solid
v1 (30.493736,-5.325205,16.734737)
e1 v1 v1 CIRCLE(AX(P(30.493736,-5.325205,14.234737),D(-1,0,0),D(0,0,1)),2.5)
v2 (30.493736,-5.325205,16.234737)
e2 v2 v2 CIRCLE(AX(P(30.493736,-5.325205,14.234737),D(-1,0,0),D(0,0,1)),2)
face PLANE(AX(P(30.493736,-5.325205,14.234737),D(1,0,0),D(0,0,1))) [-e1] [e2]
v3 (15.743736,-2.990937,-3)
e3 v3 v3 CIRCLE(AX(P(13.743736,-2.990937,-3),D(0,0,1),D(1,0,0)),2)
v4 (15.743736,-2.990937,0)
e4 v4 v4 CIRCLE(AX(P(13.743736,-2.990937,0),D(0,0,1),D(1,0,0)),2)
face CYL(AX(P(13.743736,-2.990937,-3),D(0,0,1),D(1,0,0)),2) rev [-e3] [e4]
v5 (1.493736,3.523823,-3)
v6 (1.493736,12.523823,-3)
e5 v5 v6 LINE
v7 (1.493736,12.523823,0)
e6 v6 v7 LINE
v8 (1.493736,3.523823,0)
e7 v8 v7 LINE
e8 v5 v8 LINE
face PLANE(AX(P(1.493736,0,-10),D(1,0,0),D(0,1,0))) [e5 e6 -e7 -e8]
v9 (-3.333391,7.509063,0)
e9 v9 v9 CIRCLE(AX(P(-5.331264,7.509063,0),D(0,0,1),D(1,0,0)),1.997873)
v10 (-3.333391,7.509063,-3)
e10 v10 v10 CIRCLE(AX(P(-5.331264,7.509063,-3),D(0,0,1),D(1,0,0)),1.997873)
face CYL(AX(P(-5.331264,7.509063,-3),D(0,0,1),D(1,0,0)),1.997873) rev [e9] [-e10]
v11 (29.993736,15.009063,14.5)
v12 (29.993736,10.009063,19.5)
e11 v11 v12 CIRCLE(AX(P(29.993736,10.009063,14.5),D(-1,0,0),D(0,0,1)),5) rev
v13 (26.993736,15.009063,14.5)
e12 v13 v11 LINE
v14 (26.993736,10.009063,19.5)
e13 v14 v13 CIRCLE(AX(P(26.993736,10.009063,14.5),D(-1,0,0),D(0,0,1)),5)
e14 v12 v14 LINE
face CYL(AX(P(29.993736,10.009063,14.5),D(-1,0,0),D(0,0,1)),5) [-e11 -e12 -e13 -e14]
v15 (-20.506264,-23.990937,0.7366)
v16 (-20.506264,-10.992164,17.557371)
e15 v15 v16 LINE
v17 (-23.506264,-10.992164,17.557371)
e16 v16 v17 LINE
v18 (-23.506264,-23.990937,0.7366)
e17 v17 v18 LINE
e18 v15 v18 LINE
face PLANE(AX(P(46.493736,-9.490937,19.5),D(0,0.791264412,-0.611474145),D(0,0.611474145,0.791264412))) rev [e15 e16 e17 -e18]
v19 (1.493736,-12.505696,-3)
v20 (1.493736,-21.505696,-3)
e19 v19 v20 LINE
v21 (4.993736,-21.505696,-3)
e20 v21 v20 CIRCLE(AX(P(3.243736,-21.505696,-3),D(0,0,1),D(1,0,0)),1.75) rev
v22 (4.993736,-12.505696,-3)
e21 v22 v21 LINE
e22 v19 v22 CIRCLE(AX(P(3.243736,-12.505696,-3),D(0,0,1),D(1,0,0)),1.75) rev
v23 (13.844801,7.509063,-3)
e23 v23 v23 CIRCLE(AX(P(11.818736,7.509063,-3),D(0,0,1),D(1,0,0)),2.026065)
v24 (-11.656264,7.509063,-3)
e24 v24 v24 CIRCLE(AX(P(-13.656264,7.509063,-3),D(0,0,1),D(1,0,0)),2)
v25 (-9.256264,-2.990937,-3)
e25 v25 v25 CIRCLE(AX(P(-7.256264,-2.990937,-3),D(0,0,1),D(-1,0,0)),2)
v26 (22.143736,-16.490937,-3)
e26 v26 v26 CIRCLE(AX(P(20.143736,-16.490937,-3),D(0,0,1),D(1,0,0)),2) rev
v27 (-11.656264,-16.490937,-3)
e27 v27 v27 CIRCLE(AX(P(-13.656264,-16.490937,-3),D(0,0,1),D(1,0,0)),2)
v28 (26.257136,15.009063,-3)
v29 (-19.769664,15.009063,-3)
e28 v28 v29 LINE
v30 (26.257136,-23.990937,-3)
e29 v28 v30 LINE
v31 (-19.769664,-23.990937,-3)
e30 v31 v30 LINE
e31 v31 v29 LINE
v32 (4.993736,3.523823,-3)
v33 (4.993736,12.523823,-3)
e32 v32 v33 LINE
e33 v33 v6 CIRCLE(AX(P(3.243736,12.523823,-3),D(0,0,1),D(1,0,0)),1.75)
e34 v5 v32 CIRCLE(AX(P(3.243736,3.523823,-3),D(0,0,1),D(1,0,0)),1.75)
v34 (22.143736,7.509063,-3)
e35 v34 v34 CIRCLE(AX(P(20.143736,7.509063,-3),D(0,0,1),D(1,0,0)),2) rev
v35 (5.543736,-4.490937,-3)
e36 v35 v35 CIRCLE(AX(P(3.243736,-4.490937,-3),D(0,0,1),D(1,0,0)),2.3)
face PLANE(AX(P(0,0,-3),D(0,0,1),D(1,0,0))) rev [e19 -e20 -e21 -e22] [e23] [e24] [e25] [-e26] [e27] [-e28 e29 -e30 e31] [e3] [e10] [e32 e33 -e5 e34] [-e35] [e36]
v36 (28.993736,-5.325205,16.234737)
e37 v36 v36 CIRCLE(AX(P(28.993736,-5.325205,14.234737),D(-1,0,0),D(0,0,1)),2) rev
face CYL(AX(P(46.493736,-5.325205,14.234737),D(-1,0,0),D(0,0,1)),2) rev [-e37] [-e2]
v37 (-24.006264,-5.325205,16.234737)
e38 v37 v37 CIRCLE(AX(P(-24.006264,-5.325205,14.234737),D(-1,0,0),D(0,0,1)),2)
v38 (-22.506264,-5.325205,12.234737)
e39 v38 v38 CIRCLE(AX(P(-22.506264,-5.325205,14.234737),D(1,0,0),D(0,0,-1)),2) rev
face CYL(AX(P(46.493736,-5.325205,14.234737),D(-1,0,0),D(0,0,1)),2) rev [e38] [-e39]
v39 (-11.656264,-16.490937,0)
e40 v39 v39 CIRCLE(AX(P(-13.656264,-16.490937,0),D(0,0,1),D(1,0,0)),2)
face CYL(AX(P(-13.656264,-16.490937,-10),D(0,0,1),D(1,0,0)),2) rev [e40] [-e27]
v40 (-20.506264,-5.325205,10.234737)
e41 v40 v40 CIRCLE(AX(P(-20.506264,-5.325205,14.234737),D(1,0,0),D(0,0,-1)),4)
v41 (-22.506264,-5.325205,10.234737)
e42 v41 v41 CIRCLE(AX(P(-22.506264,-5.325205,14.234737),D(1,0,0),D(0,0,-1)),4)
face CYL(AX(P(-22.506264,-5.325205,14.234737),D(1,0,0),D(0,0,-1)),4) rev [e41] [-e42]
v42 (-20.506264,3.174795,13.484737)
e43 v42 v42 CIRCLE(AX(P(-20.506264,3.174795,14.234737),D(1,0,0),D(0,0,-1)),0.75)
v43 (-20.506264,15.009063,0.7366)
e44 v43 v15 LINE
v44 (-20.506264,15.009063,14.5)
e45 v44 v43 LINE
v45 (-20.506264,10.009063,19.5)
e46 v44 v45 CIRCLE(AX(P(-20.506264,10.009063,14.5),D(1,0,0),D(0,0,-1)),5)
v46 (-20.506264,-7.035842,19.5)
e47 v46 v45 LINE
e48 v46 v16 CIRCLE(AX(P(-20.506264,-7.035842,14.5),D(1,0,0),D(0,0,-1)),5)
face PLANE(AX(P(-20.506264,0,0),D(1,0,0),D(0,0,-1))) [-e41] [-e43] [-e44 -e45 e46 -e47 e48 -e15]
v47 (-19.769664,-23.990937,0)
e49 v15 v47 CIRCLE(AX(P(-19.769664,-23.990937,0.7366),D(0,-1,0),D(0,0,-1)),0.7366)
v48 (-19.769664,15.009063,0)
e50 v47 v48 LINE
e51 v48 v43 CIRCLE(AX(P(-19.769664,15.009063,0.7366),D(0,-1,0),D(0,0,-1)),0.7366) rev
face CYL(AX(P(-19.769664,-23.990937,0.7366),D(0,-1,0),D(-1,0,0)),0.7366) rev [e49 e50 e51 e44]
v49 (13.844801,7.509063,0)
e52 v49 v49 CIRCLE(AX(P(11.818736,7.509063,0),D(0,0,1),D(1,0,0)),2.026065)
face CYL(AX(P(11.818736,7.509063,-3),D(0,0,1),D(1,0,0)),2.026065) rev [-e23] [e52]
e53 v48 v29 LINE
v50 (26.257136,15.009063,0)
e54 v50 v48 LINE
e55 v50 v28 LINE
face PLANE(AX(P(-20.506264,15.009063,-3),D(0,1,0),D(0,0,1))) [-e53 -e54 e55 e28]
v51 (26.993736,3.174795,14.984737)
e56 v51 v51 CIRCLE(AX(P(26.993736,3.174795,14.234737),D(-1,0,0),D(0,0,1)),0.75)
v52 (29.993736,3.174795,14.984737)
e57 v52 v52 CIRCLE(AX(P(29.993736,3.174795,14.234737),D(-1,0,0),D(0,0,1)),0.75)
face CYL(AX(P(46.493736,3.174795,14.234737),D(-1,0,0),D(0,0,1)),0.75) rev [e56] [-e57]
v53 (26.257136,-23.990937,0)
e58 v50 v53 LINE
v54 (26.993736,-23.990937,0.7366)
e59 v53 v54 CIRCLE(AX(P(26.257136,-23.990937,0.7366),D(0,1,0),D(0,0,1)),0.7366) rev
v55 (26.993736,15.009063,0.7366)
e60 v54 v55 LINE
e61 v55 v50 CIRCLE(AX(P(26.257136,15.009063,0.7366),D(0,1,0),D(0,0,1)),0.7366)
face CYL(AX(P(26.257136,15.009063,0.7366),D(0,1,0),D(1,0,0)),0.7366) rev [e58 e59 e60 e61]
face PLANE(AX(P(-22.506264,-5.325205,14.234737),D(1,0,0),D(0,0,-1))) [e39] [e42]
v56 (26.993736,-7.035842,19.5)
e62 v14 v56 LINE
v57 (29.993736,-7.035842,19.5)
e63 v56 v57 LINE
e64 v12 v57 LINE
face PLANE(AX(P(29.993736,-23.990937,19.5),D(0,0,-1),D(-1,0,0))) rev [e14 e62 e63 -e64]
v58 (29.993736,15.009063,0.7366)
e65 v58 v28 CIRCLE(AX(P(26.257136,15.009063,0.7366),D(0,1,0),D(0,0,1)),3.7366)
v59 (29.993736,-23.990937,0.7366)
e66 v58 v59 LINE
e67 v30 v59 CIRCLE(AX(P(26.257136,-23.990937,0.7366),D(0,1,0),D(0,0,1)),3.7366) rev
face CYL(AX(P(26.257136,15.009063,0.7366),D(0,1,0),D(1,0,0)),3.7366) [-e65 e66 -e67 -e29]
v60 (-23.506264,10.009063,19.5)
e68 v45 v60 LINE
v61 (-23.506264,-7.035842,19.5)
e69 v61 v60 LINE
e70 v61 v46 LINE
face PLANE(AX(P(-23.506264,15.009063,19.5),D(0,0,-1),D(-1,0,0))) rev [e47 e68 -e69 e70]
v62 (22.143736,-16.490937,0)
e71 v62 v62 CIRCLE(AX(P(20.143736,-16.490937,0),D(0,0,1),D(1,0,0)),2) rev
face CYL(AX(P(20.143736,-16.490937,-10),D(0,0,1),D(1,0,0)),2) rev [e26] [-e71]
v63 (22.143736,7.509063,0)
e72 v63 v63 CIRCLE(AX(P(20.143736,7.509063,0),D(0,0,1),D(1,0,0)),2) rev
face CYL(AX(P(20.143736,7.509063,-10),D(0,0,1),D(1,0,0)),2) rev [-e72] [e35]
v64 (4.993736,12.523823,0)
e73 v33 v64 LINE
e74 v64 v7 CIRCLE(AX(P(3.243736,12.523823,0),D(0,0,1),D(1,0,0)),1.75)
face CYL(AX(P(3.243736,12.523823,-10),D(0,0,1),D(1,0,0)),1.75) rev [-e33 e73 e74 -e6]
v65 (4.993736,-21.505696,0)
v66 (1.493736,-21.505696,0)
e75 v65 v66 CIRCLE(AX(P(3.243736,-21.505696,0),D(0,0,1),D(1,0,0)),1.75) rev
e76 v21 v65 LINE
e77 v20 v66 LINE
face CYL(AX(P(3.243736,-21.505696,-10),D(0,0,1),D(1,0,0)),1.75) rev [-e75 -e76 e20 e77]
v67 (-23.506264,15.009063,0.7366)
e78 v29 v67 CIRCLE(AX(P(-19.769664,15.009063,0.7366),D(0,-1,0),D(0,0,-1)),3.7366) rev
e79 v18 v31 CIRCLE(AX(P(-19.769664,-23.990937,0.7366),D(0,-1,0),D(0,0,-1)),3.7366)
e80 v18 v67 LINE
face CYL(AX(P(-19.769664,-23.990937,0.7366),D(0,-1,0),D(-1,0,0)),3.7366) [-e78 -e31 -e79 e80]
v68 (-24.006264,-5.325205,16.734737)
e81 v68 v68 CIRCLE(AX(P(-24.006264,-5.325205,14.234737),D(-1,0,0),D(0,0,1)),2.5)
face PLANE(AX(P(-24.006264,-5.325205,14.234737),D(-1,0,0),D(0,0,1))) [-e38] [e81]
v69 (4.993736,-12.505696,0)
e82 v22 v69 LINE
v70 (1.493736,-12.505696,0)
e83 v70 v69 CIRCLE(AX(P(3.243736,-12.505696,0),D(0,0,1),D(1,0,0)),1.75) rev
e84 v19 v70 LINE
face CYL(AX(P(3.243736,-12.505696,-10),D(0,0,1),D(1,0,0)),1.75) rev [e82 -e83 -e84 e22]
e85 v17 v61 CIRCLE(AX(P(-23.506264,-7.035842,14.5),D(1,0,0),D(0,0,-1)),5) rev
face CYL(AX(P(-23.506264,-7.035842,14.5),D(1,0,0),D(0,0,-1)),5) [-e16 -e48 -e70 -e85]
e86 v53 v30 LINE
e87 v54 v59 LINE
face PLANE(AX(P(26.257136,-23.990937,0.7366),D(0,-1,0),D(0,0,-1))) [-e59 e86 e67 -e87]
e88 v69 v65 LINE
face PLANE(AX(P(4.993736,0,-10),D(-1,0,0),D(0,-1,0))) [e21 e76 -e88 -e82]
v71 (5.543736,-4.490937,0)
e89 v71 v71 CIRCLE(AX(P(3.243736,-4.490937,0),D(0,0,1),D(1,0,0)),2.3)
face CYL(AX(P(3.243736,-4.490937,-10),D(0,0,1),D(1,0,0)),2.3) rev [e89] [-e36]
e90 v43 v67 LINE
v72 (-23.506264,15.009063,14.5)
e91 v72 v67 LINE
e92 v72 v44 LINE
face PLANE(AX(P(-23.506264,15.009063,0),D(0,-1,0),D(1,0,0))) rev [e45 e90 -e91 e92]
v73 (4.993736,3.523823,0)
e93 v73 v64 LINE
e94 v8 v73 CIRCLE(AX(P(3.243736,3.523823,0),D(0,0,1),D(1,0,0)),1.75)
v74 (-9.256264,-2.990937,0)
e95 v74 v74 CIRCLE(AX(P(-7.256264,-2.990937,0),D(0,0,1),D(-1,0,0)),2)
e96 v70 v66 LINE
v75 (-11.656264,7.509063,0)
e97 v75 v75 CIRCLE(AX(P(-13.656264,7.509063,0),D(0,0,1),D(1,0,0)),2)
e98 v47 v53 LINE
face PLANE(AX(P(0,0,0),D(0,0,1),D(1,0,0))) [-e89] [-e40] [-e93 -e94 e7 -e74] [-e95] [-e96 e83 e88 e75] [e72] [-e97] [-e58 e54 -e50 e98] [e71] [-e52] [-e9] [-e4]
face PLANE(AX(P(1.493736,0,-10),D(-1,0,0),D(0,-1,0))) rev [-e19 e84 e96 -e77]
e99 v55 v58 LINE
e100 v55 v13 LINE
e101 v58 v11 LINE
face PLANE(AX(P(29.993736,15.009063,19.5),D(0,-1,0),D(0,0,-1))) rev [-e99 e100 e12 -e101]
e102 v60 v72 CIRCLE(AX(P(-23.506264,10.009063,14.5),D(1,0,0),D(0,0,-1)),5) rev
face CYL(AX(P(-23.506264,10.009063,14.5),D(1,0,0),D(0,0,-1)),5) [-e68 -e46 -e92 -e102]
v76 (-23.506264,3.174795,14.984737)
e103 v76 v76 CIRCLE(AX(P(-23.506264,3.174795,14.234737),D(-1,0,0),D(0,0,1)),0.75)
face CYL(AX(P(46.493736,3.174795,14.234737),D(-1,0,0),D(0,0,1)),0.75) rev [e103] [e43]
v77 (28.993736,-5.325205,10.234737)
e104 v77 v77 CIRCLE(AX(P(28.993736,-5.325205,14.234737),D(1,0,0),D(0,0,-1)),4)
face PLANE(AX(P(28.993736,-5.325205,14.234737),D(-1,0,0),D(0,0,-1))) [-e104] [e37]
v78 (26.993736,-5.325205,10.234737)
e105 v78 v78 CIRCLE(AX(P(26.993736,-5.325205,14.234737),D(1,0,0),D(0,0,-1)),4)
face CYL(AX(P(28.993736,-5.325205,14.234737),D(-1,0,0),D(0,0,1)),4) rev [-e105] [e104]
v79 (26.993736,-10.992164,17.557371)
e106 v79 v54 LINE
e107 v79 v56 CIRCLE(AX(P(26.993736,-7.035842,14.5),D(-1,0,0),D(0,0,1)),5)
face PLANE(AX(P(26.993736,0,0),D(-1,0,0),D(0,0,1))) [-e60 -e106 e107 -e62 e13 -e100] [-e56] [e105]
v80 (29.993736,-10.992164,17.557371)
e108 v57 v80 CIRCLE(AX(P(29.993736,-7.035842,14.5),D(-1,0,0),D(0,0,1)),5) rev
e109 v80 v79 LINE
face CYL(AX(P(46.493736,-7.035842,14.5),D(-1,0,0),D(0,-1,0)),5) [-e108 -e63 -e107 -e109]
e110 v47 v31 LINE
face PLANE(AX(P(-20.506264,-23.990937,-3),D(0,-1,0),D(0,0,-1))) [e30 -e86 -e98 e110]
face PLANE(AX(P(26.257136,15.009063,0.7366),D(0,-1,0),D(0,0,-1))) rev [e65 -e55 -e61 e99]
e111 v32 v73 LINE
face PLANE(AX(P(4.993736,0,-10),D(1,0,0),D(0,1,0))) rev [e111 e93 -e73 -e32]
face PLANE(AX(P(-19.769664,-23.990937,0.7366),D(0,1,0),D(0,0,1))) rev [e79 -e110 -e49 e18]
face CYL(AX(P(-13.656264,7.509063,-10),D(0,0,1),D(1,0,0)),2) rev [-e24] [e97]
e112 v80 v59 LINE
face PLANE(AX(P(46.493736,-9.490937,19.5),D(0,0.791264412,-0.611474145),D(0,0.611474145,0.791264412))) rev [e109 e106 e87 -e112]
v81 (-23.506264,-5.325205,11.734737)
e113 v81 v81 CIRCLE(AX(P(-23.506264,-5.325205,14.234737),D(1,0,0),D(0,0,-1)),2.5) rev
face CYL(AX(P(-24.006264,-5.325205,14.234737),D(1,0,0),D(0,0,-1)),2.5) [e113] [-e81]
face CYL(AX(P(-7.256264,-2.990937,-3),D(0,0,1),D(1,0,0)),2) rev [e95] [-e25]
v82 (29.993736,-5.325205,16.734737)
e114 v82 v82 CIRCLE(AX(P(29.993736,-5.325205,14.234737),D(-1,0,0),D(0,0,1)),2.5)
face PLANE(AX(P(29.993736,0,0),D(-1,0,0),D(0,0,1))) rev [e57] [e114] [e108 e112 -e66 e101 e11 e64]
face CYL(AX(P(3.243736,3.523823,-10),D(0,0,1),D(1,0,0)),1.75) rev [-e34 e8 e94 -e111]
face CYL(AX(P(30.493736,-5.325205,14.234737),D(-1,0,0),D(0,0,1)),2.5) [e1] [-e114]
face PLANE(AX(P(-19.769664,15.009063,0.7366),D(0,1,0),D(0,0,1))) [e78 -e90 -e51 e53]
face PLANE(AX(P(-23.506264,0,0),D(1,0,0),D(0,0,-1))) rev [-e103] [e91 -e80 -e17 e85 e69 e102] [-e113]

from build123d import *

# Parameters (mm, degrees)
ESBO_O1_W                        = 47.5
ESBO_O1_H                        = 39
FLANGE_BASE1_DEPTH               = 3
ESBO_O6_R                        = 2.3
CORTE_EXTRUS_O1_DEPTH            = 10
ARESTA_FLANGE1_STRIP_W           = 13.4732
ARESTA_FLANGE1_STRIP_H           = 3
ARESTA_FLANGE1_STRIP_CUT_DEPTH   = 39
ARESTA_FLANGE1_STRIP_2_W         = 13.4732
ARESTA_FLANGE1_STRIP_2_H         = 3
ARESTA_FLANGE1_STRIP_CUT_2_DEPTH = 39
ARESTA_FLANGE1_DEPTH             = 39
ARESTA_FLANGE1_BEND_DEPTH        = 39
ESBO_O13_R                       = 2
ESBO_O13_R_2                     = 0.75
CORTE_EXTRUS_O2_DEPTH            = 70
FILETE1_R                        = 5
ESBO_O14_R                       = 1.997873176
ESBO_O14_R_2                     = 2.026064888
ESBO_O14_R_3                     = 2
CORTE_EXTRUS_O4_DEPTH            = 3
BOSS_EXTRUDE1_START              = 0.5
SKETCH1_R                        = 2.5
SKETCH1_R_2                      = 2
BOSS_EXTRUDE1_DEPTH              = 0.5
SKETCH2_R                        = 4
CUT_EXTRUDE8_DEPTH               = 2


# Sheet-metal steps are written as plain solids
with BuildPart() as part:
    # Esboço1 → Flange-base1 (new body)
    with BuildSketch(Plane.XY):
        with Locations((3.243735783, -4.490936556)):
            Rectangle(ESBO_O1_W, ESBO_O1_H)
    extrude(amount=-FLANGE_BASE1_DEPTH)

    # Esboço6 → Corte-extrusão1 (cut)
    with BuildSketch(Plane.XY):
        with BuildLine():
            Line((-13.656264217, 5.509063444), (-13.656264217, 7.509063444))
            Line((-13.656264217, 7.509063444), (-11.656264217, 7.509063444))
            ThreePointArc((-11.656264217, 7.509063444), (-15.070477779, 8.923277006), (-13.656264217, 5.509063444))
        make_face()
        with BuildLine():
            Line((-11.656264217, 7.509063444), (-13.656264217, 7.509063444))
            Line((-13.656264217, 7.509063444), (-13.656264217, 5.509063444))
            ThreePointArc((-13.656264217, 5.509063444), (-12.242050654, 6.094849882), (-11.656264217, 7.509063444))
        make_face()
        with BuildLine():
            ThreePointArc((-11.656264217, -16.490936556), (-12.242050654, -15.076722994), (-13.656264217, -14.490936556))
            Line((-13.656264217, -14.490936556), (-13.656264217, -16.490936556))
            Line((-13.656264217, -16.490936556), (-11.656264217, -16.490936556))
        make_face()
        with BuildLine():
            Line((-13.656264217, -16.490936556), (-13.656264217, -14.490936556))
            ThreePointArc((-13.656264217, -14.490936556), (-15.070477779, -17.905150118), (-11.656264217, -16.490936556))
            Line((-11.656264217, -16.490936556), (-13.656264217, -16.490936556))
        make_face()
        with Locations((3.243735783, -4.490936556)):
            Circle(ESBO_O6_R)
        with BuildLine():
            Line((4.993735783, 7.509063444), (1.493735783, 7.509063444))
            Line((1.493735783, 7.509063444), (1.493735783, 3.523823043))
            ThreePointArc((1.493735783, 3.523823043), (3.243735783, 1.773823043), (4.993735783, 3.523823043))
            Line((4.993735783, 3.523823043), (4.993735783, 7.509063444))
        make_face()
        with BuildLine():
            Line((1.493735783, 12.523823043), (1.493735783, 7.509063444))
            Line((1.493735783, 7.509063444), (4.993735783, 7.509063444))
            Line((4.993735783, 7.509063444), (4.993735783, 12.523823043))
            ThreePointArc((4.993735783, 12.523823043), (3.243735783, 14.273823043), (1.493735783, 12.523823043))
        make_face()
        with BuildLine():
            Line((1.493735783, -12.505696155), (1.493735783, -16.490936556))
            Line((1.493735783, -16.490936556), (4.993735783, -16.490936556))
            Line((4.993735783, -16.490936556), (4.993735783, -12.505696155))
            ThreePointArc((4.993735783, -12.505696155), (3.243735783, -10.755696155), (1.493735783, -12.505696155))
        make_face()
        with BuildLine():
            Line((4.993735783, -16.490936556), (1.493735783, -16.490936556))
            Line((1.493735783, -16.490936556), (1.493735783, -21.505696155))
            ThreePointArc((1.493735783, -21.505696155), (3.243735783, -23.255696155), (4.993735783, -21.505696155))
            Line((4.993735783, -21.505696155), (4.993735783, -16.490936556))
        make_face()
        with BuildLine():
            ThreePointArc((22.143735783, -16.490936556), (21.557949346, -15.076722994), (20.143735783, -14.490936556))
            Line((20.143735783, -14.490936556), (20.143735783, -16.490936556))
            Line((20.143735783, -16.490936556), (18.143735783, -16.490936556))
            ThreePointArc((18.143735783, -16.490936556), (20.143735783, -18.490936556), (22.143735783, -16.490936556))
        make_face()
        with BuildLine():
            Line((20.143735783, -16.490936556), (20.143735783, -14.490936556))
            ThreePointArc((20.143735783, -14.490936556), (18.729522221, -15.076722994), (18.143735783, -16.490936556))
            Line((18.143735783, -16.490936556), (20.143735783, -16.490936556))
        make_face()
        with BuildLine():
            ThreePointArc((22.143735783, 7.509063444), (20.143735783, 9.509063444), (18.143735783, 7.509063444))
            Line((18.143735783, 7.509063444), (20.143735783, 7.509063444))
            Line((20.143735783, 7.509063444), (20.143735783, 5.509063444))
            ThreePointArc((20.143735783, 5.509063444), (21.557949346, 6.094849882), (22.143735783, 7.509063444))
        make_face()
        with BuildLine():
            Line((20.143735783, 7.509063444), (18.143735783, 7.509063444))
            ThreePointArc((18.143735783, 7.509063444), (18.729522221, 6.094849882), (20.143735783, 5.509063444))
            Line((20.143735783, 5.509063444), (20.143735783, 7.509063444))
        make_face()
    extrude(amount=-CORTE_EXTRUS_O1_DEPTH, mode=Mode.SUBTRACT)

    # Aresta-Flange1 strip (across the edge) → Aresta-Flange1 strip cut (cut)
    with BuildSketch(Plane(origin=(26.993735783, -23.990936556, 0), x_dir=(-1, 0, 0), z_dir=(0, 1, 0))):
        with Locations((-6, -1.5)):
            Rectangle(ARESTA_FLANGE1_STRIP_W, ARESTA_FLANGE1_STRIP_H)
    extrude(amount=ARESTA_FLANGE1_STRIP_CUT_DEPTH, mode=Mode.SUBTRACT)

    # Aresta-Flange1 strip 2 (across the edge) → Aresta-Flange1 strip cut 2 (cut)
    with BuildSketch(Plane(origin=(-20.506264217, 15.009063444, 0), x_dir=(1, 0, 0), z_dir=(0, -1, 0))):
        with Locations((-6, -1.5)):
            Rectangle(ARESTA_FLANGE1_STRIP_2_W, ARESTA_FLANGE1_STRIP_2_H)
    extrude(amount=ARESTA_FLANGE1_STRIP_CUT_2_DEPTH, mode=Mode.SUBTRACT)

    # Aresta-Flange1 section (across the edge) → Aresta-Flange1 (add)
    with BuildSketch(Plane(origin=(26.993735783, -23.990936556, 0), x_dir=(-1, 0, 0), z_dir=(0, 1, 0))):
        with BuildLine():
            Line((-3, 0.7366), (-3, 19.5))
            Line((-3, 19.5), (0, 19.5))
            Line((0, 19.5), (0, 0.7366))
            ThreePointArc((0, 0.7366), (0.215745145, 0.215745145), (0.7366, 0))
            Line((0.7366, 0), (0.7366, -3))
            ThreePointArc((0.7366, -3), (-1.905575199, -1.905575199), (-3, 0.7366))
        make_face()
    extrude(amount=ARESTA_FLANGE1_DEPTH)

    # Aresta-Flange1 section 2 (across the edge) → Aresta-Flange1 bend (add)
    with BuildSketch(Plane(origin=(-20.506264217, 15.009063444, 0), x_dir=(1, 0, 0), z_dir=(0, -1, 0))):
        with BuildLine():
            Line((-3, 0.7366), (-3, 19.5))
            Line((-3, 19.5), (0, 19.5))
            Line((0, 19.5), (0, 0.7366))
            ThreePointArc((0, 0.7366), (0.215745145, 0.215745145), (0.7366, 0))
            Line((0.7366, 0), (0.7366, -3))
            ThreePointArc((0.7366, -3), (-1.905575199, -1.905575199), (-3, 0.7366))
        make_face()
    extrude(amount=ARESTA_FLANGE1_BEND_DEPTH)

    # Esboço13 → Corte-extrusão2 (cut)
    with BuildSketch(Plane.ZY.offset(23.506264217)):
        with Locations((14.234737, -5.325205188)):
            Circle(ESBO_O13_R)
        with Locations((14.234737, 3.174794812)):
            Circle(ESBO_O13_R_2)
        Polygon((0.7366, -23.990936556), (19.5, -23.990936556), (19.5, -9.490936556), align=None)
    extrude(amount=-CORTE_EXTRUS_O2_DEPTH, mode=Mode.SUBTRACT)

    # Filete1
    filete1_edges = [part.edges().sort_by_distance(p)[0] for p in [
        (28.493735783, 15.009063444, 19.5),
        (-22.006264217, 15.009063444, 19.5),
        (-22.006264217, -9.490936556, 19.5),
        (28.493735783, -9.490936556, 19.5),
    ]]
    fillet(filete1_edges, radius=FILETE1_R)

    # Esboço14 → Corte-extrusão4 (cut)
    with BuildSketch(Plane.XY):
        with Locations((-5.331264217, 7.509063444)):
            Circle(ESBO_O14_R)
        with Locations((11.818735783, 7.509063444)):
            Circle(ESBO_O14_R_2)
        with Locations((13.743735783, -2.990936556)):
            Circle(ESBO_O14_R_3)
        with Locations(Location((-7.256264217, -2.990936556, 0), (0, 0, 180))):
            Circle(ESBO_O14_R_3)
    extrude(amount=-CORTE_EXTRUS_O4_DEPTH, mode=Mode.SUBTRACT)

    # Sketch1 → Boss-Extrude1 (add)
    with BuildSketch(Plane.ZY.offset(23.506264217).offset(BOSS_EXTRUDE1_START)):
        with Locations(Location((14.234737, -5.325205188, 0), (0, 0, 180))):
            Circle(SKETCH1_R)
        with Locations((14.234737, -5.325205188)):
            Circle(SKETCH1_R_2, mode=Mode.SUBTRACT)
    boss_extrude1 = extrude(amount=-BOSS_EXTRUDE1_DEPTH)

    # Sketch2 → Cut-Extrude8 (cut)
    with BuildSketch(Plane(origin=(-20.506264217, 0, 0), x_dir=(0, 0, -1), z_dir=(1, 0, 0))):
        with Locations((-14.234737, -5.325205188)):
            Circle(SKETCH2_R)
    cut_extrude8 = extrude(amount=-CUT_EXTRUDE8_DEPTH, mode=Mode.SUBTRACT)

    # Mirror1: Boss-Extrude1, Cut-Extrude8 across plane
    add(boss_extrude1.mirror(Plane.ZY.offset(-3.243735783)))
    add(cut_extrude8.mirror(Plane.ZY.offset(-3.243735783)), mode=Mode.SUBTRACT)


solid = part.part
